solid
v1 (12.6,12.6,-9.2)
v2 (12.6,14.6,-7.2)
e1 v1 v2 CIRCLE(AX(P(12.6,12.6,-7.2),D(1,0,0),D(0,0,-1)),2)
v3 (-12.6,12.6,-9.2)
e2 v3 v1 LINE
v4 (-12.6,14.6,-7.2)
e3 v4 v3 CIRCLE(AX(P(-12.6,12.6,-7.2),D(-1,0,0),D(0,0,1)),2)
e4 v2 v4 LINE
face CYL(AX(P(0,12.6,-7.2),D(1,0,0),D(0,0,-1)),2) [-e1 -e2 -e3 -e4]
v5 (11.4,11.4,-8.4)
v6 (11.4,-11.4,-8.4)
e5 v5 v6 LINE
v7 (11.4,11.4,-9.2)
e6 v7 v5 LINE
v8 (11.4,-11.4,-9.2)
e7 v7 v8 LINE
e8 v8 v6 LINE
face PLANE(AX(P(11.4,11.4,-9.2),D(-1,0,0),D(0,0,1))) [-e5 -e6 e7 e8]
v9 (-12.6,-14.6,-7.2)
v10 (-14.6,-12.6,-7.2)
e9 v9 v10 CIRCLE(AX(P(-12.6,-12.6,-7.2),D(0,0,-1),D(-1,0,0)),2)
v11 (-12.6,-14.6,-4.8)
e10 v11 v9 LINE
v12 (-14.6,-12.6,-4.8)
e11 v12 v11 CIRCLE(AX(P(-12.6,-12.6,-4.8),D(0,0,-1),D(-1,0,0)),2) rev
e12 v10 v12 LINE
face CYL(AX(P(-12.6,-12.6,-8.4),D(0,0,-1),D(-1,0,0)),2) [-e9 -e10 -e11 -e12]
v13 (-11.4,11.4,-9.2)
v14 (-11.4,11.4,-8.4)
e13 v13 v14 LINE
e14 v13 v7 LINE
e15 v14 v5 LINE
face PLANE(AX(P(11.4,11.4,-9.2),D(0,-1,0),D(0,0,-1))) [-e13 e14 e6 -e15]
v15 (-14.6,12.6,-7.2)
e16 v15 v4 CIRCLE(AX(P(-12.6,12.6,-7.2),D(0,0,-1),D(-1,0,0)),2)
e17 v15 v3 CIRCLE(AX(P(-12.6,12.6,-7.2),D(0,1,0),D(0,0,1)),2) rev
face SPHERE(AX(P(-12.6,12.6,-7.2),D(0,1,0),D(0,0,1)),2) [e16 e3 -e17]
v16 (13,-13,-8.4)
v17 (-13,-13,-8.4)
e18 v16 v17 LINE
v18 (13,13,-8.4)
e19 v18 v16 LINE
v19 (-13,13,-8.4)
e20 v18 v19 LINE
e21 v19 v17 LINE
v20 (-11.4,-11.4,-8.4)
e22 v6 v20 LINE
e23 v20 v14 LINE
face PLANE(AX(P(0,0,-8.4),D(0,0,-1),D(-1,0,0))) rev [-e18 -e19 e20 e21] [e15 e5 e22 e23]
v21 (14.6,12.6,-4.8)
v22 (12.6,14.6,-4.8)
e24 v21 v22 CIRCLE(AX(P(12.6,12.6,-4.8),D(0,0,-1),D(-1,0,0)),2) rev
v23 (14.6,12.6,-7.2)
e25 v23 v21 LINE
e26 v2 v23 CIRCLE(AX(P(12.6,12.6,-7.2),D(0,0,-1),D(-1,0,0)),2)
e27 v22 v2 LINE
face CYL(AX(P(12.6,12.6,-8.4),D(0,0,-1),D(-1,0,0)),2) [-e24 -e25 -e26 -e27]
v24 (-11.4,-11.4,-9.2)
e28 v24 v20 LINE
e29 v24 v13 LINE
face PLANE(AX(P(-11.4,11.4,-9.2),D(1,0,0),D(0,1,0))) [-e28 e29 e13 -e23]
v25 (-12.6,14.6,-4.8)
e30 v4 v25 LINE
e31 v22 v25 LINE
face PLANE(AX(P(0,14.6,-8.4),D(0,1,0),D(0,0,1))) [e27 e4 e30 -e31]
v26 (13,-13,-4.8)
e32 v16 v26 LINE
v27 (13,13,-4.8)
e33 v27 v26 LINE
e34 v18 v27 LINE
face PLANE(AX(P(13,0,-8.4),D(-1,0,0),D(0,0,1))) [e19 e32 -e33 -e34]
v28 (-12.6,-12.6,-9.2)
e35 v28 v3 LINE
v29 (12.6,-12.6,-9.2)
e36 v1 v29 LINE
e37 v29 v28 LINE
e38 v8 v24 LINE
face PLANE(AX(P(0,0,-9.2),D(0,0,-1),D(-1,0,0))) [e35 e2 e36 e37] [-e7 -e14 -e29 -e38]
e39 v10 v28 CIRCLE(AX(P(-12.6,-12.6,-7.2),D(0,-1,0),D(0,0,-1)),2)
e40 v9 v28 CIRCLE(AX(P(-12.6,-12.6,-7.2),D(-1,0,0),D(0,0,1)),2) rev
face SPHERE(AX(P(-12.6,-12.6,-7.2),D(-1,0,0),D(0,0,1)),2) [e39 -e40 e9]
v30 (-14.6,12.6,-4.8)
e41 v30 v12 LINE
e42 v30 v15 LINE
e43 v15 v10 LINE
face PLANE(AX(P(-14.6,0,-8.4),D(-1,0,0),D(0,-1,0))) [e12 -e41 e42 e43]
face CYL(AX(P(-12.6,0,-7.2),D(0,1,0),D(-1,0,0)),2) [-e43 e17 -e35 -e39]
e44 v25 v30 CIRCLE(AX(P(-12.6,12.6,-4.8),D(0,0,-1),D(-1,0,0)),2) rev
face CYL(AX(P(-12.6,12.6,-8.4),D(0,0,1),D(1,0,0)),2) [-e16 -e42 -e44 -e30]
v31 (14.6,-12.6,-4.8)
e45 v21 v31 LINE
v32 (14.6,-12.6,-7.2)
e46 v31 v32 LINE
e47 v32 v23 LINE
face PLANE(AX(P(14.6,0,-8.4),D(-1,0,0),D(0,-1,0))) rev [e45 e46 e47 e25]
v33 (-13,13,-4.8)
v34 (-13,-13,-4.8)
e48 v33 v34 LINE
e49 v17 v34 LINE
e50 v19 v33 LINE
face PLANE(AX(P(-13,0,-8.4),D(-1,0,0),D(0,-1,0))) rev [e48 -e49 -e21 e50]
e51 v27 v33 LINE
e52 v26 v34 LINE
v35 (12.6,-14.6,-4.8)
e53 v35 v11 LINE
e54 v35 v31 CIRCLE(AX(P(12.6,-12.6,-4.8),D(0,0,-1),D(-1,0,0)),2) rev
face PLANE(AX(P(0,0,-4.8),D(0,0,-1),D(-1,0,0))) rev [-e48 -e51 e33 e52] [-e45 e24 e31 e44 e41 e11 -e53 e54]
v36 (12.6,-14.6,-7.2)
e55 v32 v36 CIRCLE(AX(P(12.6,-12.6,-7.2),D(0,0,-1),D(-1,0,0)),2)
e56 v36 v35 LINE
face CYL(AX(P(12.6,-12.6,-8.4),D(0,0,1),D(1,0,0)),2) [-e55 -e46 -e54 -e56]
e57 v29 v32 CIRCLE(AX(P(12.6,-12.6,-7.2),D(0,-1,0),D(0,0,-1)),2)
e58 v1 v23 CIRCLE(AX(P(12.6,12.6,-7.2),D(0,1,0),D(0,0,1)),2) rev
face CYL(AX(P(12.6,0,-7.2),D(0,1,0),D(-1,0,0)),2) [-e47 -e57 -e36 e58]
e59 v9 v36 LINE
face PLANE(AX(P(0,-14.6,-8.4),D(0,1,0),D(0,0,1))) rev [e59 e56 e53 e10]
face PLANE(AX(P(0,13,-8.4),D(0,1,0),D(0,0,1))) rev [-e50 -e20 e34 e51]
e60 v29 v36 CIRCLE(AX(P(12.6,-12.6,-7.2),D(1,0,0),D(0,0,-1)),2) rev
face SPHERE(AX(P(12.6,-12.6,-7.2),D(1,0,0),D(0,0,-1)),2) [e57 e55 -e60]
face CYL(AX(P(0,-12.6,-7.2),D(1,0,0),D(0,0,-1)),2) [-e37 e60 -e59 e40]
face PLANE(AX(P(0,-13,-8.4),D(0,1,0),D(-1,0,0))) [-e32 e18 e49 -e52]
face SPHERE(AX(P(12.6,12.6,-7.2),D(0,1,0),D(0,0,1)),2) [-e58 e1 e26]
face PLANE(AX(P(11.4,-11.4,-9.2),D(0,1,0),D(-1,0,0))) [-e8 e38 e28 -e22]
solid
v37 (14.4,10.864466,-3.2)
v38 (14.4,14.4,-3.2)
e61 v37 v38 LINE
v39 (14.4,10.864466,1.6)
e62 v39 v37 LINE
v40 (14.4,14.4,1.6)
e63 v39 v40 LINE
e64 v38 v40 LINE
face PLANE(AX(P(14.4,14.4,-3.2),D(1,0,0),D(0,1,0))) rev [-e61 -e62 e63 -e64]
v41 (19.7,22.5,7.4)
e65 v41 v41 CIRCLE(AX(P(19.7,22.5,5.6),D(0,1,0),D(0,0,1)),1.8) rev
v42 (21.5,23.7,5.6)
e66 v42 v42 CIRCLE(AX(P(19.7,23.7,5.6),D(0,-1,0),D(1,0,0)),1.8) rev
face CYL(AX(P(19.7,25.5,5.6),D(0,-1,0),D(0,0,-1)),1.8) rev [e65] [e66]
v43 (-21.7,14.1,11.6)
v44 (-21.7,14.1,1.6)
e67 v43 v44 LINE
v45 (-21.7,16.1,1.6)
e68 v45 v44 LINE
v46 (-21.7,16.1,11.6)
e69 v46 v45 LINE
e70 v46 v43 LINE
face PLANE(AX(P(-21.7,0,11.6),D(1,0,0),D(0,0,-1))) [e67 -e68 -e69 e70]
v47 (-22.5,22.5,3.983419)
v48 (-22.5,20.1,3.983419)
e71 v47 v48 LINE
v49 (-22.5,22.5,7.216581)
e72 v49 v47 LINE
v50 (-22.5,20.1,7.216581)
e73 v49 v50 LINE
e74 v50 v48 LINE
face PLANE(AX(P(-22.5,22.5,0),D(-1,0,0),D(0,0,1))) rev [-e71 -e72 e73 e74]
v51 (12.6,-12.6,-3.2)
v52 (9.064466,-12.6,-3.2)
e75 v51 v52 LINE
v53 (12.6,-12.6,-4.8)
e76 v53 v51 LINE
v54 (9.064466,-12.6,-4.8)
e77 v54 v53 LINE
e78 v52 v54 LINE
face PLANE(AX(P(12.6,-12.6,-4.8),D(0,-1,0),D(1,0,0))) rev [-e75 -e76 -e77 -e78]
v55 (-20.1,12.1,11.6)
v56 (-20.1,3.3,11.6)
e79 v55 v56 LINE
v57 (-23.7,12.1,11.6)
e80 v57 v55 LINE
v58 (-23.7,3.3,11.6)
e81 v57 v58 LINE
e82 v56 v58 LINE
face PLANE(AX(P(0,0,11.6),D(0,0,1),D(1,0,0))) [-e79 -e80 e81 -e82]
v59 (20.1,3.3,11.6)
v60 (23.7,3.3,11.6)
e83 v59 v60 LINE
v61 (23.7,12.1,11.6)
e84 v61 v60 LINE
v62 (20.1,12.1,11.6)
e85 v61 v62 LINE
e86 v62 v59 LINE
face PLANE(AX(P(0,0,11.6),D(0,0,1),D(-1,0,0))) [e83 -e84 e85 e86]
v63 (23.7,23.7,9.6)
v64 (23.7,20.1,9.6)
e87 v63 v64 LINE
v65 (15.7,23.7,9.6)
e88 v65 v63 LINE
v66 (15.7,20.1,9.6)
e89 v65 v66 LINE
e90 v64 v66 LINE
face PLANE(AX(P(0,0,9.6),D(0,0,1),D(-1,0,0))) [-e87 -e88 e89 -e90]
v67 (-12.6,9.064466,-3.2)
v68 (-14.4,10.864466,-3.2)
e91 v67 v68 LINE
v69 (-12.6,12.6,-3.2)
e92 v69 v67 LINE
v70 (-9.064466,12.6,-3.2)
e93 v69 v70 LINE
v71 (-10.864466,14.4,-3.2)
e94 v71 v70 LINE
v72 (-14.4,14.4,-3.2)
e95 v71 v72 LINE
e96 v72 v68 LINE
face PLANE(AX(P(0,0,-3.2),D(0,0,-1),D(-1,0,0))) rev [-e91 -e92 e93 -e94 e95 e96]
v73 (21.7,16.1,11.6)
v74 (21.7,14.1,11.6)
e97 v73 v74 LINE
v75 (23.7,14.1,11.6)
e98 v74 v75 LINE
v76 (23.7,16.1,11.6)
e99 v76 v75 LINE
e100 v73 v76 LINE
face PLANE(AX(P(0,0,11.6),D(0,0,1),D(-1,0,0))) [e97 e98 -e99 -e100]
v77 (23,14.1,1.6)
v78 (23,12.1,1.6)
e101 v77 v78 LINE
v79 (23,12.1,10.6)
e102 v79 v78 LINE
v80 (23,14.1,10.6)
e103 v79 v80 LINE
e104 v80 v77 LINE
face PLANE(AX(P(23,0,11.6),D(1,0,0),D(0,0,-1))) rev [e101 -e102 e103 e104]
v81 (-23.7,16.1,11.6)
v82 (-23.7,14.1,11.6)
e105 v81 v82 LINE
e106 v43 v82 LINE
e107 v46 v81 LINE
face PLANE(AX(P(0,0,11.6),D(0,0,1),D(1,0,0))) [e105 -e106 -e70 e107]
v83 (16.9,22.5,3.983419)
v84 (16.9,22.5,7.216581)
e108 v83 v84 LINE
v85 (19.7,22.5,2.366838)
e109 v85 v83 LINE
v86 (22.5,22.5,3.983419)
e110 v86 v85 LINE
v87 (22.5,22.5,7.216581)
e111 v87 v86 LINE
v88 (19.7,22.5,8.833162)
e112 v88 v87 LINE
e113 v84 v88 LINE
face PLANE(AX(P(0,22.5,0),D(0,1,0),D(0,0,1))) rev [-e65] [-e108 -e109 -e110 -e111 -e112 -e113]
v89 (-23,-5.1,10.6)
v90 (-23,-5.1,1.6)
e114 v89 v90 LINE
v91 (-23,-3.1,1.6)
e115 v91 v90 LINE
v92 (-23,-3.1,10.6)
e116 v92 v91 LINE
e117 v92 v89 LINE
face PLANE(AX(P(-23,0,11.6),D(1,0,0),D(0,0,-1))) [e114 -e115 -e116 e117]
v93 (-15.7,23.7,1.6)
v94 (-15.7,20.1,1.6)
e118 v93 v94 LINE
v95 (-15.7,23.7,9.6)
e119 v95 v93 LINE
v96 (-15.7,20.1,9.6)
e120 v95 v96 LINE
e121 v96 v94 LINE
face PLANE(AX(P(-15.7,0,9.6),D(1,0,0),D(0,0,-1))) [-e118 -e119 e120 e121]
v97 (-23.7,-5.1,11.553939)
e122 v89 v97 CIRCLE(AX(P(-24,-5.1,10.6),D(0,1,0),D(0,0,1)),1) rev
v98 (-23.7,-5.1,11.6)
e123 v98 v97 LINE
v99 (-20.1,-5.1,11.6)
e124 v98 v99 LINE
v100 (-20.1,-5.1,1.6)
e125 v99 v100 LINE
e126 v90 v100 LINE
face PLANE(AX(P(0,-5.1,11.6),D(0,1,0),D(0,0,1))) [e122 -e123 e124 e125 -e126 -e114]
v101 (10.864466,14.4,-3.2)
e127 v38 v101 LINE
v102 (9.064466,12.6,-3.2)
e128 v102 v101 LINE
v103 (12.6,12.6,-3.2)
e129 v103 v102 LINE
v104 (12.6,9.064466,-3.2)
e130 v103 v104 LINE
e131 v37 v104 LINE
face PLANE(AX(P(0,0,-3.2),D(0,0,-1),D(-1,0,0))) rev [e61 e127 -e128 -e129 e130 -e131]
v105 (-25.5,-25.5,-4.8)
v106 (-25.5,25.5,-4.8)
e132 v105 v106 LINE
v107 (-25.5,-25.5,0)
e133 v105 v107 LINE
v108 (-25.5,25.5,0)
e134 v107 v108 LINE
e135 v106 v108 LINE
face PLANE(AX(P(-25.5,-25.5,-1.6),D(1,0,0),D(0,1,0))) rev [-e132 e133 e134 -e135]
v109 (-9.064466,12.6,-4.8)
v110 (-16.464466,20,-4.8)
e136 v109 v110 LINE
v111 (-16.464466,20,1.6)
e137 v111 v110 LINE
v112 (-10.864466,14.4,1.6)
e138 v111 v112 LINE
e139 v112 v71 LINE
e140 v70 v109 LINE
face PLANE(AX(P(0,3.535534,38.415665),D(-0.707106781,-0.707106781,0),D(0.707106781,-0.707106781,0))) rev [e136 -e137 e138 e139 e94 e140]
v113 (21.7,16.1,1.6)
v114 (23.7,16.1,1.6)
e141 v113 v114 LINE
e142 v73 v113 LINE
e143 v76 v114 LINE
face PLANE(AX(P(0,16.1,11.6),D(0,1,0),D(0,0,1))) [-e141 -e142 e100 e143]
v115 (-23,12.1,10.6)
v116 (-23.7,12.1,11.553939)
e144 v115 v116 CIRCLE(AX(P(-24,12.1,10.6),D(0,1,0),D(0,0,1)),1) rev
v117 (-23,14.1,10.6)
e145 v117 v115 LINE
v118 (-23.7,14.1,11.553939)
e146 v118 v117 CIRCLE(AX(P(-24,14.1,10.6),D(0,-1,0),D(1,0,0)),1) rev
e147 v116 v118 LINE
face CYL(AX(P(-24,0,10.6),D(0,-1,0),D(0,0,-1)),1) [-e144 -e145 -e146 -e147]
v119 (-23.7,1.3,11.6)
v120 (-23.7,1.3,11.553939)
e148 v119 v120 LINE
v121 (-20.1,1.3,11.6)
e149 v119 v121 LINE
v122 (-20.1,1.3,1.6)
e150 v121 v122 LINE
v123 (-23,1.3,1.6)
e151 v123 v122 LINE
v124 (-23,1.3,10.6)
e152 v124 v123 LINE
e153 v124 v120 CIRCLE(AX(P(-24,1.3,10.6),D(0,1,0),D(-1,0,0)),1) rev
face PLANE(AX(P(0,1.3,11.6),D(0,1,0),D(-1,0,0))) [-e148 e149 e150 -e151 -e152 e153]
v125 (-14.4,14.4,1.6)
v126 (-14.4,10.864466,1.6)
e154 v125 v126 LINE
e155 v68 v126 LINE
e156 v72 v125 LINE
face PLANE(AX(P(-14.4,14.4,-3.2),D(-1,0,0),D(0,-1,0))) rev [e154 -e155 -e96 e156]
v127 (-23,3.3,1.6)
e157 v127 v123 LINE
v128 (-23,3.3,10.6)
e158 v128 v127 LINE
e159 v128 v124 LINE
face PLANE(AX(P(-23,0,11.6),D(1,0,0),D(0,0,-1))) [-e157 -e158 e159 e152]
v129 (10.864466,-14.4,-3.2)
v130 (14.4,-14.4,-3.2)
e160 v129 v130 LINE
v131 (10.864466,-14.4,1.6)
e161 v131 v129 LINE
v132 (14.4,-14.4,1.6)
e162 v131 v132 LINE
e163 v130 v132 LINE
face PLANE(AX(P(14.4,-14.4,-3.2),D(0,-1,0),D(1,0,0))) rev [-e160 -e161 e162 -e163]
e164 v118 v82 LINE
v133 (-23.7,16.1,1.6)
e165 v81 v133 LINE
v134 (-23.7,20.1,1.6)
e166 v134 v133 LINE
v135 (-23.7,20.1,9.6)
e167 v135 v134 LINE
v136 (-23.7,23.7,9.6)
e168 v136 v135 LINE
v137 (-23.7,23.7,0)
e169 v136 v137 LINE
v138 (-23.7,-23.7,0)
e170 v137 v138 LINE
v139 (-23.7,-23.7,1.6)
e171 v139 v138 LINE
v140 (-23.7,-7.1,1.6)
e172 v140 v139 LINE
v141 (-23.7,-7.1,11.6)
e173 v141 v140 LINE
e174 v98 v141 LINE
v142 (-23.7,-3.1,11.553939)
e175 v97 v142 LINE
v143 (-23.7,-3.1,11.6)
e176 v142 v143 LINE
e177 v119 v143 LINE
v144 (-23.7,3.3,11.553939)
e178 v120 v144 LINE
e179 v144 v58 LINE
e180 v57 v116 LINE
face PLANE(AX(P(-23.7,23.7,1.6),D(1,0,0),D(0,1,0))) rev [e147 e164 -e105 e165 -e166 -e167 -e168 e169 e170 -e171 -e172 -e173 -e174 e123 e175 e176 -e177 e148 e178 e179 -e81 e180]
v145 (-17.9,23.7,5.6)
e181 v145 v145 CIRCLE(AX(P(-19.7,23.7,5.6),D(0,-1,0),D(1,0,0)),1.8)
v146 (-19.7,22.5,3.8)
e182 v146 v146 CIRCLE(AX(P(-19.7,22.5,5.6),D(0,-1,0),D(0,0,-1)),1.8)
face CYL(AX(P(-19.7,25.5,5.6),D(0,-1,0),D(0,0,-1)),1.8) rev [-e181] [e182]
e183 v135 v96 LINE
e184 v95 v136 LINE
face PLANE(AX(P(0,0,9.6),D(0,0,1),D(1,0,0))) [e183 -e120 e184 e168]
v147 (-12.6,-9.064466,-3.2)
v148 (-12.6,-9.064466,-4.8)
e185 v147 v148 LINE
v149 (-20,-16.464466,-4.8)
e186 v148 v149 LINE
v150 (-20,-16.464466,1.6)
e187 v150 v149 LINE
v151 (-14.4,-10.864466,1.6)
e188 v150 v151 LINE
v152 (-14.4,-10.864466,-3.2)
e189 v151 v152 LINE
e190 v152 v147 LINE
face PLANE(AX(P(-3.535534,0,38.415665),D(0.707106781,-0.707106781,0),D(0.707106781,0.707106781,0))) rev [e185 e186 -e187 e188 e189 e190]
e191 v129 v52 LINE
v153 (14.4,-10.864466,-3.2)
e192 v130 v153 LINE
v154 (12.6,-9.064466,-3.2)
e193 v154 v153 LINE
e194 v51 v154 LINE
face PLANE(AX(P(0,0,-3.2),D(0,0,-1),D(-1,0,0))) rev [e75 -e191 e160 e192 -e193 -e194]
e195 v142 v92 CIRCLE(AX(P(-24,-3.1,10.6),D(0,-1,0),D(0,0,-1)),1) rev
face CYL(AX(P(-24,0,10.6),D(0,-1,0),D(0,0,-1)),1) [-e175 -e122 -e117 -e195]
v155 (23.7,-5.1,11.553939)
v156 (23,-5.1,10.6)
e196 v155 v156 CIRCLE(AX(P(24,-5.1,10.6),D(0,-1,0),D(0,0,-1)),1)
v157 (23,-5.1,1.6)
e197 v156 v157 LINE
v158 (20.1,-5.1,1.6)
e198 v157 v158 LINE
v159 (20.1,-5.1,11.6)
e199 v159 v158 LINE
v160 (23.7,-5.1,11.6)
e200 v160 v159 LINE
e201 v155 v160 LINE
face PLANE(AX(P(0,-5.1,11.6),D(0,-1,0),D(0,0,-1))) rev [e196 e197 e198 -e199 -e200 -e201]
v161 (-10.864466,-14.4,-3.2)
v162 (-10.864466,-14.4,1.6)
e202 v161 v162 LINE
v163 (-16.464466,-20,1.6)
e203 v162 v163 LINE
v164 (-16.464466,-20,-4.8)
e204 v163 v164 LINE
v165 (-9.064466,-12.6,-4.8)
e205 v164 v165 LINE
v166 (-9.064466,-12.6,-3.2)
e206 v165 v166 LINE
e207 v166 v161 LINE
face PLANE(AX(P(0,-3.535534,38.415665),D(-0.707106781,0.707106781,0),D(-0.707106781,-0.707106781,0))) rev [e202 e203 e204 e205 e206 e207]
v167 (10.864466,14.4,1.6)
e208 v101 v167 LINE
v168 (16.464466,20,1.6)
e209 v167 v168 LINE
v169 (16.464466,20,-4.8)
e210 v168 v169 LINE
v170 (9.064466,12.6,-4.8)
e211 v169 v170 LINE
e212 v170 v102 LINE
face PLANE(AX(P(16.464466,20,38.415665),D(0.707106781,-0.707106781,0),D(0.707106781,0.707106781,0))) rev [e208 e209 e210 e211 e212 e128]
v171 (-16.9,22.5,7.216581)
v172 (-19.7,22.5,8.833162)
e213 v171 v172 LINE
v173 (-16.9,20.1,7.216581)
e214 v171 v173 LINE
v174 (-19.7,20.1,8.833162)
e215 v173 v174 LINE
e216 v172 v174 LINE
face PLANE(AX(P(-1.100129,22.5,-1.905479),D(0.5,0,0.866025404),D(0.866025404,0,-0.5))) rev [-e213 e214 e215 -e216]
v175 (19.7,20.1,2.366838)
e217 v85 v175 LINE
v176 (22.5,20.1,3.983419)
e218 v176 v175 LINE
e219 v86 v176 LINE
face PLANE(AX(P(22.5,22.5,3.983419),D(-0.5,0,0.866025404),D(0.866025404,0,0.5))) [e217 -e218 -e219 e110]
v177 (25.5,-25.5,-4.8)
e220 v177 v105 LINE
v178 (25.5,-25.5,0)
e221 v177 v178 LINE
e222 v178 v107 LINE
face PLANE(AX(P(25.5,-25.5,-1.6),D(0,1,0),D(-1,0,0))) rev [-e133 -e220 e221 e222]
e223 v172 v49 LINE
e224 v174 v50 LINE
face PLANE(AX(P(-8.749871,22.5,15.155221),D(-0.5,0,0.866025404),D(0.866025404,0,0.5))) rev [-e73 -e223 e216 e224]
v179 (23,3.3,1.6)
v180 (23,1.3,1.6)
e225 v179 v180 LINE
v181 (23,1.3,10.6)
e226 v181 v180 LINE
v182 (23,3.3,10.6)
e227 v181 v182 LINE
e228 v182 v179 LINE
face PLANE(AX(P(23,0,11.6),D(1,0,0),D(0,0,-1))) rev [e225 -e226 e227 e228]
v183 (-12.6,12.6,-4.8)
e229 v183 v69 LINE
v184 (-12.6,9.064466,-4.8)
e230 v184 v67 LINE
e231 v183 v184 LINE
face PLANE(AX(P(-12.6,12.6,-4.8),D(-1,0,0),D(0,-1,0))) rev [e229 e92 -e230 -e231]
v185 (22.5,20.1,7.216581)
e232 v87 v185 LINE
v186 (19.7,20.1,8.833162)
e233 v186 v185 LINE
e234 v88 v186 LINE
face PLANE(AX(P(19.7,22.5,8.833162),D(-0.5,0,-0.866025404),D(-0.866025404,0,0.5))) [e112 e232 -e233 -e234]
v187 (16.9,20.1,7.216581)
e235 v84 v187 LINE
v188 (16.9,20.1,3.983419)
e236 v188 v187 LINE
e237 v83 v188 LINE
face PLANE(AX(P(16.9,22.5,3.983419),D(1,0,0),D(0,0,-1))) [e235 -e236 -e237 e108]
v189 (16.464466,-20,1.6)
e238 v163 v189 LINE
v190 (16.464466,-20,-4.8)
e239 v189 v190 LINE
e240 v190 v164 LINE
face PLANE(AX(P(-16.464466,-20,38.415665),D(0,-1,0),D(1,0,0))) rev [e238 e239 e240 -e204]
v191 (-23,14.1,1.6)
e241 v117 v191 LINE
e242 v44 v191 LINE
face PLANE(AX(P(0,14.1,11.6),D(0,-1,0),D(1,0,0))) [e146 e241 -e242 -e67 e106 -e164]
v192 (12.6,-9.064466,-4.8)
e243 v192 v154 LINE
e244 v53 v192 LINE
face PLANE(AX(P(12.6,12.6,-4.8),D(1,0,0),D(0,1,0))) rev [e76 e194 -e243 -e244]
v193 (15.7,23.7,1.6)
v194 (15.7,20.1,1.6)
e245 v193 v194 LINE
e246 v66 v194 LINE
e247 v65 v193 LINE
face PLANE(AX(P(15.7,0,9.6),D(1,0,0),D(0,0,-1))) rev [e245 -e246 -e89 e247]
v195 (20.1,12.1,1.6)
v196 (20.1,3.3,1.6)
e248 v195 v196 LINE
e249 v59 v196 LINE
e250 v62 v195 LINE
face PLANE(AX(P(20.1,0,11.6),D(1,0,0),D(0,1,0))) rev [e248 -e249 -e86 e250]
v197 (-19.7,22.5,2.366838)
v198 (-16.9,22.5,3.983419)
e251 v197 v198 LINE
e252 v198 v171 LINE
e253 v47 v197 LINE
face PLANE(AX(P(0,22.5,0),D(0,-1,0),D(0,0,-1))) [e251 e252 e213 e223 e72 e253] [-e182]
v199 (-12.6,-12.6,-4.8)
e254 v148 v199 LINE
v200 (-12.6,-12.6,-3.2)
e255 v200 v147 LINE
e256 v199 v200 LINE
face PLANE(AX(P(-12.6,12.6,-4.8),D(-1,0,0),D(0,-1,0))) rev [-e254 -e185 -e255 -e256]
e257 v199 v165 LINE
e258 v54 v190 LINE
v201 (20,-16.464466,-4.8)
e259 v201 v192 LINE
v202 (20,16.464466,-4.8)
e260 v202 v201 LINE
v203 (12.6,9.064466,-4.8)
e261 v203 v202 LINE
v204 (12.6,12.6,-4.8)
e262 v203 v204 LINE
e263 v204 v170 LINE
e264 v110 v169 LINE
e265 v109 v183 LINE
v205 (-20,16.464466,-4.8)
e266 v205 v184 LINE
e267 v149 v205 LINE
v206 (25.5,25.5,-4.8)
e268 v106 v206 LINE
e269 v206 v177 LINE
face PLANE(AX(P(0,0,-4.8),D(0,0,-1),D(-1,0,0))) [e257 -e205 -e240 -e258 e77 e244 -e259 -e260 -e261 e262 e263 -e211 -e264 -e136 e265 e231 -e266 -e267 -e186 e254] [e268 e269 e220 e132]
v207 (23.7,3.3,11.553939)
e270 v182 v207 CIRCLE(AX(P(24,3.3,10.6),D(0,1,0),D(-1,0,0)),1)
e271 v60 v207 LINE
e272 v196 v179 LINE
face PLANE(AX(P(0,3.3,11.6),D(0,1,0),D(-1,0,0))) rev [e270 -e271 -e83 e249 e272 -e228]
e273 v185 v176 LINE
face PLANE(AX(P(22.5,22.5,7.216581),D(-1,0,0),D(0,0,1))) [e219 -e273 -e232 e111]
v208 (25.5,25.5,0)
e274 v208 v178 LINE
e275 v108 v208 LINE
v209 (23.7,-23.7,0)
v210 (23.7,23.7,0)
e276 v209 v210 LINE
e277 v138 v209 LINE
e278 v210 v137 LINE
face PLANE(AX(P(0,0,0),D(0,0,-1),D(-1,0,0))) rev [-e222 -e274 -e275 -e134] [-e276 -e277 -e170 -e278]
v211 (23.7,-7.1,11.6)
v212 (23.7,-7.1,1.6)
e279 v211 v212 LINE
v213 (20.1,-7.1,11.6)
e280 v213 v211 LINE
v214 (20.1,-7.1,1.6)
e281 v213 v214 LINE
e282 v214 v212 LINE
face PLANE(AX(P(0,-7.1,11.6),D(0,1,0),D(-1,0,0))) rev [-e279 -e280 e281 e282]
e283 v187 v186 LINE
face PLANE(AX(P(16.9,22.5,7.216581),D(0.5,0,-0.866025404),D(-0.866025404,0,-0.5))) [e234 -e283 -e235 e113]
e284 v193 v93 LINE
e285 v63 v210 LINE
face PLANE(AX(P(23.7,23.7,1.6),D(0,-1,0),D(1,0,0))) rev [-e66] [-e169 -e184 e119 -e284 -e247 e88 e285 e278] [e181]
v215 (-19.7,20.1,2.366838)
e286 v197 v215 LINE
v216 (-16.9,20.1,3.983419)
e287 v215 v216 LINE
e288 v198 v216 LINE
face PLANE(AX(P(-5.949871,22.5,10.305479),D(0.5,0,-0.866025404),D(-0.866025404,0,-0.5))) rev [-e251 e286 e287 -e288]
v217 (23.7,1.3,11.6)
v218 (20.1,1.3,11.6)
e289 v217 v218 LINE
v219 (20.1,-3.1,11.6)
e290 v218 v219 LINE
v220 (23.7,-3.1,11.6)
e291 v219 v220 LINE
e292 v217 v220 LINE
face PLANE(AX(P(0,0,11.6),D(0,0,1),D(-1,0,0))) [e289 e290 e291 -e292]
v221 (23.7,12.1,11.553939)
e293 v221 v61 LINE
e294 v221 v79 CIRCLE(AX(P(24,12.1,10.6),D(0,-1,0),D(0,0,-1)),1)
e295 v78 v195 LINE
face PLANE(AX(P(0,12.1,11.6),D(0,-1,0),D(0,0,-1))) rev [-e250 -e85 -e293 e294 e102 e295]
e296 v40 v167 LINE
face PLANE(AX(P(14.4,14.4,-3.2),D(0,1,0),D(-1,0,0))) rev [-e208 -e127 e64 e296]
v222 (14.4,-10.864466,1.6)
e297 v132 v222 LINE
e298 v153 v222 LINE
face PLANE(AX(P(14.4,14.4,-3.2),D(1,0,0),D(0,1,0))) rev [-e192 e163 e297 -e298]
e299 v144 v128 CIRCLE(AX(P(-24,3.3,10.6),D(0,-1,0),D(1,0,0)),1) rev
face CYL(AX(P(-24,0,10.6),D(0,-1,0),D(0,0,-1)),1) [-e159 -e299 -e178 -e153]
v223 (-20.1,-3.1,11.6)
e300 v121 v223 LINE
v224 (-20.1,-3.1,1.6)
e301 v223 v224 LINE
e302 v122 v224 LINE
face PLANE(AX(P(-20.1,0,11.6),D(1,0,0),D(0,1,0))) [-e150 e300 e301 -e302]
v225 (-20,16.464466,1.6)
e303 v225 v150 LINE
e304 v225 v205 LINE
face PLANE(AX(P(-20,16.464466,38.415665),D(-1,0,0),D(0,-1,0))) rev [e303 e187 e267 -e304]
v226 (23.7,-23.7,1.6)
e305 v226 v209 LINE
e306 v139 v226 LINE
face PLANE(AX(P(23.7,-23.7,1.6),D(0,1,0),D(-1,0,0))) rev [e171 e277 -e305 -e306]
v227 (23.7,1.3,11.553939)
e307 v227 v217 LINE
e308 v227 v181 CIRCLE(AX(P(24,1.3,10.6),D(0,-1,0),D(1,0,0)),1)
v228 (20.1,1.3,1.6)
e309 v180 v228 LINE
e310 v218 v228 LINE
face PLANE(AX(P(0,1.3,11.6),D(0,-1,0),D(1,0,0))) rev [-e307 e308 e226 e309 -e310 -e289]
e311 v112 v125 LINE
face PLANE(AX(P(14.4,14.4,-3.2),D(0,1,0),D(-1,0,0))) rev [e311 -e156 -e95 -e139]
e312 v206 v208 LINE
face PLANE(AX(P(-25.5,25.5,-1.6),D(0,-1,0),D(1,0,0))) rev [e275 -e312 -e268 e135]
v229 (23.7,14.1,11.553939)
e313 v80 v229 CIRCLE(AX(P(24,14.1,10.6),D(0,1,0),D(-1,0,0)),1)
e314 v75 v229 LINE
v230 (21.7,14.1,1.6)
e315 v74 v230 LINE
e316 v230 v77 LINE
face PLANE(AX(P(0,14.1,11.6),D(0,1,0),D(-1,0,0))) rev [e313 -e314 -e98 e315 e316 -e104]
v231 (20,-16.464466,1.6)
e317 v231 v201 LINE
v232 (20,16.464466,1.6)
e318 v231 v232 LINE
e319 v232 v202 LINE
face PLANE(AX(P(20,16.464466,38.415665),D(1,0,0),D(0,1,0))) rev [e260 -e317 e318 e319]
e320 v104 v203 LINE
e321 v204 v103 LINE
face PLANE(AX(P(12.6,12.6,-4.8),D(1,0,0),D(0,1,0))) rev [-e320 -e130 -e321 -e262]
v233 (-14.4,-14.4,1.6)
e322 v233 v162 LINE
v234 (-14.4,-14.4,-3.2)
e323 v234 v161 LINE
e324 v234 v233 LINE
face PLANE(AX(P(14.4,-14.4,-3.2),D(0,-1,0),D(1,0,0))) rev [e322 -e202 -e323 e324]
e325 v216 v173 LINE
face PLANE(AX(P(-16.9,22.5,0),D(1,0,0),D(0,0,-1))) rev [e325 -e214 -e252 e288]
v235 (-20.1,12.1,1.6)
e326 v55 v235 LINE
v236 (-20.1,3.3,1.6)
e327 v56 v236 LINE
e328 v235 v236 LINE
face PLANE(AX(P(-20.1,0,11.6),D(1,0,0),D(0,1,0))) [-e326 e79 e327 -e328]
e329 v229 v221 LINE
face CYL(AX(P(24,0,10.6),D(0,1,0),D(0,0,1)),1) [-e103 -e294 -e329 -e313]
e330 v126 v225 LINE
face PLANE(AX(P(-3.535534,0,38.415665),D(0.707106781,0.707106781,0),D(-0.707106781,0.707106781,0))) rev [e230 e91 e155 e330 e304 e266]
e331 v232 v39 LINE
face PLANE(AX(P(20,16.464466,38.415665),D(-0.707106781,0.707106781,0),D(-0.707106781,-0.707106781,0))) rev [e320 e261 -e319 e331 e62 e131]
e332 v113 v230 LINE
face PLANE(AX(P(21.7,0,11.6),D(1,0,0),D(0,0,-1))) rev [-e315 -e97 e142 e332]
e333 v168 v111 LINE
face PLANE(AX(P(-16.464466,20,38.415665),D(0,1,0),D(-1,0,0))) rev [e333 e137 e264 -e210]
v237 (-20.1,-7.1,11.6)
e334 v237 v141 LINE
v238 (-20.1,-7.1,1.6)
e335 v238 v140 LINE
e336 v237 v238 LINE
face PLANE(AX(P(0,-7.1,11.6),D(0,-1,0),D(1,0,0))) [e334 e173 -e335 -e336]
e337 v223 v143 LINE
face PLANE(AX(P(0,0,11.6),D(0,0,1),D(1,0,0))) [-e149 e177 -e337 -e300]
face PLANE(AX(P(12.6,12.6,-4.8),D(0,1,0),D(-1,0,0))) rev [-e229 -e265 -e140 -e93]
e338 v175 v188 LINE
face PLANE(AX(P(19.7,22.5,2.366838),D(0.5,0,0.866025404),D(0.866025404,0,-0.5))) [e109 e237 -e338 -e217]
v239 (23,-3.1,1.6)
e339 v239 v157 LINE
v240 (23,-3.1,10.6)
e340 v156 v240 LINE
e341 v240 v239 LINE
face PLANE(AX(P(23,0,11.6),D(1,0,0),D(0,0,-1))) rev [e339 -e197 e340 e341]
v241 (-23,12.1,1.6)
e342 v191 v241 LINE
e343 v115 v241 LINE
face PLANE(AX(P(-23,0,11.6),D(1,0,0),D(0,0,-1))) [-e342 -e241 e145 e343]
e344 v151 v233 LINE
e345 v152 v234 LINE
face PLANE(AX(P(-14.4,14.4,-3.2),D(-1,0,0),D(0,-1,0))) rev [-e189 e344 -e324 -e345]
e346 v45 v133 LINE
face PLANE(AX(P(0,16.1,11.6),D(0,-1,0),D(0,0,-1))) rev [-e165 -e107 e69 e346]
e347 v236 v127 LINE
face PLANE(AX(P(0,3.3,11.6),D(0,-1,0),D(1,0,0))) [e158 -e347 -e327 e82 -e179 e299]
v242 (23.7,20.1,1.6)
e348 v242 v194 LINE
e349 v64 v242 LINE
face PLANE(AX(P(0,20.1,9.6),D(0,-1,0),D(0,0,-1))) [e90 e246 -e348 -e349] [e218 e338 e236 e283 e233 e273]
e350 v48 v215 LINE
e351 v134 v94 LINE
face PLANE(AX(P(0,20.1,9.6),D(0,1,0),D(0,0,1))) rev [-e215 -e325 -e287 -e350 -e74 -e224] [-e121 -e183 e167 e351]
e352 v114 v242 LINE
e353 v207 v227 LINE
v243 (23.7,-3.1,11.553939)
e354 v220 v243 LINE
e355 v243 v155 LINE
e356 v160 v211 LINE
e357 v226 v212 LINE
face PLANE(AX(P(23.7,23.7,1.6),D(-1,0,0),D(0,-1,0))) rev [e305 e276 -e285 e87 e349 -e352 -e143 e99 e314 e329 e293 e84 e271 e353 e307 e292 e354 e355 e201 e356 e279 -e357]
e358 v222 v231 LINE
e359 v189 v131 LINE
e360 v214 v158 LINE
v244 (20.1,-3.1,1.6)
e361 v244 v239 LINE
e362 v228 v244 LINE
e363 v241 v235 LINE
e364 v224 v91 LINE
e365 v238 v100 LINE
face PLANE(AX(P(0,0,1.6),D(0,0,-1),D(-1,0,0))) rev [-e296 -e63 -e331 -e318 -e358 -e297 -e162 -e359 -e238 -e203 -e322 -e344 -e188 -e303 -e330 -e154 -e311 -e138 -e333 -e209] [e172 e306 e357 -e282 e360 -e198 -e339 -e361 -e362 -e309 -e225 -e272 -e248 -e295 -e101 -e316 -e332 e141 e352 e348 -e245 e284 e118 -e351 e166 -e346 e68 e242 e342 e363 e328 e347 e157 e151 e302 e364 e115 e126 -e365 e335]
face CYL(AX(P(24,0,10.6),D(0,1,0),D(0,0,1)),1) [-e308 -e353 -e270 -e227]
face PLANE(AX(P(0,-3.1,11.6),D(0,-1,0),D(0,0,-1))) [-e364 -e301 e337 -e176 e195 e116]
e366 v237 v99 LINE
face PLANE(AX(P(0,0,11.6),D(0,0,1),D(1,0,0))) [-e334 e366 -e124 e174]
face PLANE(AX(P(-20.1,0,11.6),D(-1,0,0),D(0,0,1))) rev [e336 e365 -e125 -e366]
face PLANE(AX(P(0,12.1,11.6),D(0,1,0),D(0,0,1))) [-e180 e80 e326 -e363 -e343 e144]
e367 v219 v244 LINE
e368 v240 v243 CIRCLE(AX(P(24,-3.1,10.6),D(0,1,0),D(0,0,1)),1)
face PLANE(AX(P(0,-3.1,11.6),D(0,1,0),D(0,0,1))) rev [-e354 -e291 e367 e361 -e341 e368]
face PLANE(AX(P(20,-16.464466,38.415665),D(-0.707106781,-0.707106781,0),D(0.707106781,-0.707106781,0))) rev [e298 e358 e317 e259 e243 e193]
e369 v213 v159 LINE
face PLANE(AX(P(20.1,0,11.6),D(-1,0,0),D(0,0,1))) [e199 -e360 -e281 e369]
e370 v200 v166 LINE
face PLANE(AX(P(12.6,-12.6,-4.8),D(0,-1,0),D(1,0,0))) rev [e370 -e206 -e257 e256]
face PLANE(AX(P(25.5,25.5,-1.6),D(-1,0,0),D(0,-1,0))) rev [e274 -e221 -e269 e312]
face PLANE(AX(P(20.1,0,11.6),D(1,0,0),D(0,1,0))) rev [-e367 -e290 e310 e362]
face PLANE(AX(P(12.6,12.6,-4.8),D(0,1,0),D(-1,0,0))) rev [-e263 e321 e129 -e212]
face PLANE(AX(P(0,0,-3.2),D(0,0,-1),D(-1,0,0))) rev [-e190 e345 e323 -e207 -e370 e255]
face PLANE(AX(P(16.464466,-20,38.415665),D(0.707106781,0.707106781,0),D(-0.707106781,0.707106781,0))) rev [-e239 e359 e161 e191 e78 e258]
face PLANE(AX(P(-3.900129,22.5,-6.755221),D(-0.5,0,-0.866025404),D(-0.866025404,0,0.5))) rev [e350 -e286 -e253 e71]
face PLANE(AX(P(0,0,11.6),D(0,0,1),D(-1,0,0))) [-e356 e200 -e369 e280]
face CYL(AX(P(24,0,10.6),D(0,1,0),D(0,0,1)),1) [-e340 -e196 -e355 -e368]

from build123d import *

# Parameters (mm, degrees)
ESBO_O3_W                = 47.4
ESBO_O3_H                = 47.4
RESSALTO_EXTRUS_O2_DEPTH = 1.6
ESBO_O5_W                = 51
ESBO_O5_H                = 51
RESSALTO_EXTRUS_O3_DEPTH = 1.6
CORTE_EXTRUS_O1_DEPTH    = 3.2
RESSALTO_EXTRUS_O4_DEPTH = 10
FILETE1_R                = 1
ESBO_O10_W               = 51
ESBO_O10_H               = 51
RESSALTO_EXTRUS_O5_DEPTH = 3.2
ESBO_O11_W               = 28.8
ESBO_O11_H               = 28.8
CORTE_EXTRUS_O2_DEPTH    = 4.8
ESBO_O14_W               = 25.2
ESBO_O14_H               = 25.2
CORTE_EXTRUS_O4_DEPTH    = 39.981277557
ESBO_O7_3_W              = 8
ESBO_O7_3_H              = 3.6
RESSALTO_EXTRUS_O7_DEPTH = 8
ESBO_O18_R               = 1.8
CORTE_EXTRUS_O8_DEPTH    = 2.4
ESBO_O18_3_R             = 1.8
CORTE_EXTRUS_O9_DEPTH    = 54.517940917
RESSALTO_EXTRUS_O8_DEPTH = 3.6
ESBO_O20_W               = 29.2
ESBO_O20_H               = 29.2
ESBO_O20_W_2             = 22.8
ESBO_O20_H_2             = 22.8
RESSALTO_EXTRUS_O9_DEPTH = 0.8
FILETE2_R                = 2


with BuildPart() as part:
    # Esboço3 → Ressalto-extrusão2 (new body)
    with BuildSketch(Plane.XY):
        Rectangle(ESBO_O3_W, ESBO_O3_H)
    extrude(amount=RESSALTO_EXTRUS_O2_DEPTH)

    # Esboço5 → Ressalto-extrusão3 (add)
    with BuildSketch(Plane(origin=(0, 0, 0), x_dir=(-1, 0, 0), z_dir=(0, 0, -1))):
        Rectangle(ESBO_O5_W, ESBO_O5_H)
    extrude(amount=RESSALTO_EXTRUS_O3_DEPTH)

    # Esboço6 → Corte-extrusão1 (cut)
    with BuildSketch(Plane(origin=(0, 0, -1.6), x_dir=(-1, 0, 0), z_dir=(0, 0, -1))):
        Polygon((3.535533906, 0), (20, 16.464466094), (20, -16.464466094), align=None)
        Polygon((-16.464466094, -20), (0, -3.535533906), (16.464466094, -20), align=None)
        Polygon((-20, 16.464466094), (-3.535533906, 0), (-20, -16.464466094), align=None)
        Polygon((-16.464466094, 20), (0, 3.535533906), (16.464466094, 20), align=None)
    extrude(amount=-CORTE_EXTRUS_O1_DEPTH, mode=Mode.SUBTRACT)

    # Esboço7 → Ressalto-extrusão4 (add)
    with BuildSketch(Plane.XY.offset(1.6)):
        Polygon((-21.7, 16.1), (-23.7, 16.1), (-23.7, -7.1), (-20.1, -7.1), (-20.1, -5.1), (-23, -5.1), (-23, -3.1), (-20.1, -3.1), (-20.1, 1.3), (-23, 1.3), (-23, 3.3), (-20.1, 3.3), (-20.1, 12.1), (-23, 12.1), (-23, 14.1), (-21.7, 14.1), align=None)
    ressalto_extrus_o4 = extrude(amount=RESSALTO_EXTRUS_O4_DEPTH)

    # Espelhar1: Ressalto-extrusão4 across plane
    add(ressalto_extrus_o4.mirror(Plane(origin=(0, 0, 0), x_dir=(0, 0, 1), z_dir=(1, 0, 0))))

    # Filete1
    # the kernel refuses this fillet: 1 mm, written as the material it takes off along each edge
    with BuildSketch(Plane(origin=(23, 12.1, 11.6), x_dir=(0, 0, -1), z_dir=(0, 1, 0)), Plane(origin=(23, 1.3, 11.6), x_dir=(0, 0, -1), z_dir=(0, 1, 0)), Plane(origin=(23, -5.1, 11.6), x_dir=(0, 0, -1), z_dir=(0, 1, 0)), Plane(origin=(-23, -5.1, 11.6), x_dir=(-1, 0, 0), z_dir=(0, 1, 0)), Plane(origin=(-23, 1.3, 11.6), x_dir=(-1, 0, 0), z_dir=(0, 1, 0)), Plane(origin=(-23, 12.1, 11.6), x_dir=(-1, 0, 0), z_dir=(0, 1, 0))) as filete1_piece_1:
        with BuildLine():
            CenterArc((FILETE1_R, -FILETE1_R), FILETE1_R, 90, 90)
            Line((0, -FILETE1_R), (0, 0))
            Line((0, 0), (FILETE1_R, 0))
        make_face()
    extrude(amount=2, mode=Mode.SUBTRACT)

    # Esboço10 → Ressalto-extrusão5 (add)
    with BuildSketch(Plane(origin=(0, 0, -1.6), x_dir=(-1, 0, 0), z_dir=(0, 0, -1))):
        Rectangle(ESBO_O10_W, ESBO_O10_H)
        Polygon((-16.464466094, -20), (16.464466094, -20), (0, -3.535533906), align=None, mode=Mode.SUBTRACT)
        Polygon((3.535533906, 0), (20, -16.464466094), (20, 16.464466094), align=None, mode=Mode.SUBTRACT)
        Polygon((0, 3.535533906), (16.464466094, 20), (-16.464466094, 20), align=None, mode=Mode.SUBTRACT)
        Polygon((-3.535533906, 0), (-20, 16.464466094), (-20, -16.464466094), align=None, mode=Mode.SUBTRACT)
    extrude(amount=RESSALTO_EXTRUS_O5_DEPTH)

    # Esboço11 → Corte-extrusão2 (cut)
    with BuildSketch(Plane.XY.offset(1.6)):
        Rectangle(ESBO_O11_W, ESBO_O11_H)
    extrude(amount=-CORTE_EXTRUS_O2_DEPTH, mode=Mode.SUBTRACT)

    # Esboço14 → Corte-extrusão4 (cut, through all)
    with BuildSketch(Plane.XY.offset(-3.2)):
        Rectangle(ESBO_O14_W, ESBO_O14_H)
    extrude(amount=-CORTE_EXTRUS_O4_DEPTH, mode=Mode.SUBTRACT)

    # Esboço7<3> → Ressalto-extrusão7 (add)
    with BuildSketch(Plane.XY.offset(1.6)):
        with Locations((-19.7, 21.9)):
            Rectangle(ESBO_O7_3_W, ESBO_O7_3_H)
    ressalto_extrus_o7 = extrude(amount=RESSALTO_EXTRUS_O7_DEPTH)

    # Espelhar2: Ressalto-extrusão7 across plane
    add(ressalto_extrus_o7.mirror(Plane(origin=(0, 0, 0), x_dir=(0, 0, 1), z_dir=(1, 0, 0))))

    # Esboço18 → Corte-extrusão8 (cut)
    # profile 1 of 2: a face of its own
    with BuildSketch(Plane.XZ.offset(-20.1)):
        Polygon((-16.9, 3.983419246), (-16.9, 7.216580754), (-19.7, 8.833161507), (-22.5, 7.216580754), (-22.5, 3.983419246), (-19.7, 2.366838493), align=None)
        with Locations(Location((-19.7, 5.6, 0), (0, 0, 270))):
            Circle(ESBO_O18_R, mode=Mode.SUBTRACT)
    # profile 2 of 2: a face of its own
    with BuildSketch(Plane.XZ.offset(-20.1)):
        Polygon((16.9, 7.216580754), (19.7, 8.833161507), (22.5, 7.216580754), (22.5, 3.983419246), (19.7, 2.366838493), (16.9, 3.983419246), align=None)
    extrude(amount=-CORTE_EXTRUS_O8_DEPTH, mode=Mode.SUBTRACT)

    # Esboço18<3> → Corte-extrusão9 (cut, through all)
    with BuildSketch(Plane.XZ.offset(-20.1)):
        with Locations((19.7, 5.6)):
            Circle(ESBO_O18_3_R)
        with Locations(Location((-19.7, 5.6, 0), (0, 0, 270))):
            Circle(ESBO_O18_3_R)
    extrude(amount=-CORTE_EXTRUS_O9_DEPTH, mode=Mode.SUBTRACT)


with BuildPart() as body_2:
    # Esboço19 → Ressalto-extrusão8 (new body)
    with BuildSketch(Plane(origin=(0, 0, -4.8), x_dir=(-1, 0, 0), z_dir=(0, 0, -1))):
        Polygon((-13, 9.464466094), (-13, 13), (-9.464466094, 13), (-11.064466094, 14.6), (-14.6, 14.6), (-14.6, 11.064466094), align=None)
        Polygon((-13, -9.464466094), (-13, 9.464466094), (-14.6, 11.064466094), (-14.6, -11.064466094), align=None)
        Polygon((-11.064466094, 14.6), (-9.464466094, 13), (9.464466094, 13), (11.064466094, 14.6), align=None)
        Polygon((11.064466094, 14.6), (9.464466094, 13), (13, 13), (13, 9.464466094), (14.6, 11.064466094), (14.6, 14.6), align=None)
        Polygon((14.6, 11.064466094), (13, 9.464466094), (13, -9.464466094), (14.6, -11.064466094), align=None)
        Polygon((13, -13), (9.464466094, -13), (11.064466094, -14.6), (14.6, -14.6), (14.6, -11.064466094), (13, -9.464466094), align=None)
        Polygon((9.464466094, -13), (-9.464466094, -13), (-11.064466094, -14.6), (11.064466094, -14.6), align=None)
        Polygon((-13, -13), (-13, -9.464466094), (-14.6, -11.064466094), (-14.6, -14.6), (-11.064466094, -14.6), (-9.464466094, -13), align=None)
    extrude(amount=RESSALTO_EXTRUS_O8_DEPTH)

    # Esboço20 → Ressalto-extrusão9 (add)
    with BuildSketch(Plane(origin=(0, 0, -8.4), x_dir=(-1, 0, 0), z_dir=(0, 0, -1))):
        Rectangle(ESBO_O20_W, ESBO_O20_H)
        Rectangle(ESBO_O20_W_2, ESBO_O20_H_2, mode=Mode.SUBTRACT)
    extrude(amount=RESSALTO_EXTRUS_O9_DEPTH)

    # Filete2
    filete2_edges = [body_2.edges().sort_by_distance(p)[0] for p in [
        (14.6, -14.6, -7),
        (14.6, 14.6, -7),
        (-14.6, 14.6, -7),
        (-14.6, -14.6, -7),
        (14.6, 0, -9.2),
        (0, -14.6, -9.2),
        (-14.6, 0, -9.2),
        (0, 14.6, -9.2),
    ]]
    fillet(filete2_edges, radius=FILETE2_R)


solid = Compound([part.part, body_2.part])
